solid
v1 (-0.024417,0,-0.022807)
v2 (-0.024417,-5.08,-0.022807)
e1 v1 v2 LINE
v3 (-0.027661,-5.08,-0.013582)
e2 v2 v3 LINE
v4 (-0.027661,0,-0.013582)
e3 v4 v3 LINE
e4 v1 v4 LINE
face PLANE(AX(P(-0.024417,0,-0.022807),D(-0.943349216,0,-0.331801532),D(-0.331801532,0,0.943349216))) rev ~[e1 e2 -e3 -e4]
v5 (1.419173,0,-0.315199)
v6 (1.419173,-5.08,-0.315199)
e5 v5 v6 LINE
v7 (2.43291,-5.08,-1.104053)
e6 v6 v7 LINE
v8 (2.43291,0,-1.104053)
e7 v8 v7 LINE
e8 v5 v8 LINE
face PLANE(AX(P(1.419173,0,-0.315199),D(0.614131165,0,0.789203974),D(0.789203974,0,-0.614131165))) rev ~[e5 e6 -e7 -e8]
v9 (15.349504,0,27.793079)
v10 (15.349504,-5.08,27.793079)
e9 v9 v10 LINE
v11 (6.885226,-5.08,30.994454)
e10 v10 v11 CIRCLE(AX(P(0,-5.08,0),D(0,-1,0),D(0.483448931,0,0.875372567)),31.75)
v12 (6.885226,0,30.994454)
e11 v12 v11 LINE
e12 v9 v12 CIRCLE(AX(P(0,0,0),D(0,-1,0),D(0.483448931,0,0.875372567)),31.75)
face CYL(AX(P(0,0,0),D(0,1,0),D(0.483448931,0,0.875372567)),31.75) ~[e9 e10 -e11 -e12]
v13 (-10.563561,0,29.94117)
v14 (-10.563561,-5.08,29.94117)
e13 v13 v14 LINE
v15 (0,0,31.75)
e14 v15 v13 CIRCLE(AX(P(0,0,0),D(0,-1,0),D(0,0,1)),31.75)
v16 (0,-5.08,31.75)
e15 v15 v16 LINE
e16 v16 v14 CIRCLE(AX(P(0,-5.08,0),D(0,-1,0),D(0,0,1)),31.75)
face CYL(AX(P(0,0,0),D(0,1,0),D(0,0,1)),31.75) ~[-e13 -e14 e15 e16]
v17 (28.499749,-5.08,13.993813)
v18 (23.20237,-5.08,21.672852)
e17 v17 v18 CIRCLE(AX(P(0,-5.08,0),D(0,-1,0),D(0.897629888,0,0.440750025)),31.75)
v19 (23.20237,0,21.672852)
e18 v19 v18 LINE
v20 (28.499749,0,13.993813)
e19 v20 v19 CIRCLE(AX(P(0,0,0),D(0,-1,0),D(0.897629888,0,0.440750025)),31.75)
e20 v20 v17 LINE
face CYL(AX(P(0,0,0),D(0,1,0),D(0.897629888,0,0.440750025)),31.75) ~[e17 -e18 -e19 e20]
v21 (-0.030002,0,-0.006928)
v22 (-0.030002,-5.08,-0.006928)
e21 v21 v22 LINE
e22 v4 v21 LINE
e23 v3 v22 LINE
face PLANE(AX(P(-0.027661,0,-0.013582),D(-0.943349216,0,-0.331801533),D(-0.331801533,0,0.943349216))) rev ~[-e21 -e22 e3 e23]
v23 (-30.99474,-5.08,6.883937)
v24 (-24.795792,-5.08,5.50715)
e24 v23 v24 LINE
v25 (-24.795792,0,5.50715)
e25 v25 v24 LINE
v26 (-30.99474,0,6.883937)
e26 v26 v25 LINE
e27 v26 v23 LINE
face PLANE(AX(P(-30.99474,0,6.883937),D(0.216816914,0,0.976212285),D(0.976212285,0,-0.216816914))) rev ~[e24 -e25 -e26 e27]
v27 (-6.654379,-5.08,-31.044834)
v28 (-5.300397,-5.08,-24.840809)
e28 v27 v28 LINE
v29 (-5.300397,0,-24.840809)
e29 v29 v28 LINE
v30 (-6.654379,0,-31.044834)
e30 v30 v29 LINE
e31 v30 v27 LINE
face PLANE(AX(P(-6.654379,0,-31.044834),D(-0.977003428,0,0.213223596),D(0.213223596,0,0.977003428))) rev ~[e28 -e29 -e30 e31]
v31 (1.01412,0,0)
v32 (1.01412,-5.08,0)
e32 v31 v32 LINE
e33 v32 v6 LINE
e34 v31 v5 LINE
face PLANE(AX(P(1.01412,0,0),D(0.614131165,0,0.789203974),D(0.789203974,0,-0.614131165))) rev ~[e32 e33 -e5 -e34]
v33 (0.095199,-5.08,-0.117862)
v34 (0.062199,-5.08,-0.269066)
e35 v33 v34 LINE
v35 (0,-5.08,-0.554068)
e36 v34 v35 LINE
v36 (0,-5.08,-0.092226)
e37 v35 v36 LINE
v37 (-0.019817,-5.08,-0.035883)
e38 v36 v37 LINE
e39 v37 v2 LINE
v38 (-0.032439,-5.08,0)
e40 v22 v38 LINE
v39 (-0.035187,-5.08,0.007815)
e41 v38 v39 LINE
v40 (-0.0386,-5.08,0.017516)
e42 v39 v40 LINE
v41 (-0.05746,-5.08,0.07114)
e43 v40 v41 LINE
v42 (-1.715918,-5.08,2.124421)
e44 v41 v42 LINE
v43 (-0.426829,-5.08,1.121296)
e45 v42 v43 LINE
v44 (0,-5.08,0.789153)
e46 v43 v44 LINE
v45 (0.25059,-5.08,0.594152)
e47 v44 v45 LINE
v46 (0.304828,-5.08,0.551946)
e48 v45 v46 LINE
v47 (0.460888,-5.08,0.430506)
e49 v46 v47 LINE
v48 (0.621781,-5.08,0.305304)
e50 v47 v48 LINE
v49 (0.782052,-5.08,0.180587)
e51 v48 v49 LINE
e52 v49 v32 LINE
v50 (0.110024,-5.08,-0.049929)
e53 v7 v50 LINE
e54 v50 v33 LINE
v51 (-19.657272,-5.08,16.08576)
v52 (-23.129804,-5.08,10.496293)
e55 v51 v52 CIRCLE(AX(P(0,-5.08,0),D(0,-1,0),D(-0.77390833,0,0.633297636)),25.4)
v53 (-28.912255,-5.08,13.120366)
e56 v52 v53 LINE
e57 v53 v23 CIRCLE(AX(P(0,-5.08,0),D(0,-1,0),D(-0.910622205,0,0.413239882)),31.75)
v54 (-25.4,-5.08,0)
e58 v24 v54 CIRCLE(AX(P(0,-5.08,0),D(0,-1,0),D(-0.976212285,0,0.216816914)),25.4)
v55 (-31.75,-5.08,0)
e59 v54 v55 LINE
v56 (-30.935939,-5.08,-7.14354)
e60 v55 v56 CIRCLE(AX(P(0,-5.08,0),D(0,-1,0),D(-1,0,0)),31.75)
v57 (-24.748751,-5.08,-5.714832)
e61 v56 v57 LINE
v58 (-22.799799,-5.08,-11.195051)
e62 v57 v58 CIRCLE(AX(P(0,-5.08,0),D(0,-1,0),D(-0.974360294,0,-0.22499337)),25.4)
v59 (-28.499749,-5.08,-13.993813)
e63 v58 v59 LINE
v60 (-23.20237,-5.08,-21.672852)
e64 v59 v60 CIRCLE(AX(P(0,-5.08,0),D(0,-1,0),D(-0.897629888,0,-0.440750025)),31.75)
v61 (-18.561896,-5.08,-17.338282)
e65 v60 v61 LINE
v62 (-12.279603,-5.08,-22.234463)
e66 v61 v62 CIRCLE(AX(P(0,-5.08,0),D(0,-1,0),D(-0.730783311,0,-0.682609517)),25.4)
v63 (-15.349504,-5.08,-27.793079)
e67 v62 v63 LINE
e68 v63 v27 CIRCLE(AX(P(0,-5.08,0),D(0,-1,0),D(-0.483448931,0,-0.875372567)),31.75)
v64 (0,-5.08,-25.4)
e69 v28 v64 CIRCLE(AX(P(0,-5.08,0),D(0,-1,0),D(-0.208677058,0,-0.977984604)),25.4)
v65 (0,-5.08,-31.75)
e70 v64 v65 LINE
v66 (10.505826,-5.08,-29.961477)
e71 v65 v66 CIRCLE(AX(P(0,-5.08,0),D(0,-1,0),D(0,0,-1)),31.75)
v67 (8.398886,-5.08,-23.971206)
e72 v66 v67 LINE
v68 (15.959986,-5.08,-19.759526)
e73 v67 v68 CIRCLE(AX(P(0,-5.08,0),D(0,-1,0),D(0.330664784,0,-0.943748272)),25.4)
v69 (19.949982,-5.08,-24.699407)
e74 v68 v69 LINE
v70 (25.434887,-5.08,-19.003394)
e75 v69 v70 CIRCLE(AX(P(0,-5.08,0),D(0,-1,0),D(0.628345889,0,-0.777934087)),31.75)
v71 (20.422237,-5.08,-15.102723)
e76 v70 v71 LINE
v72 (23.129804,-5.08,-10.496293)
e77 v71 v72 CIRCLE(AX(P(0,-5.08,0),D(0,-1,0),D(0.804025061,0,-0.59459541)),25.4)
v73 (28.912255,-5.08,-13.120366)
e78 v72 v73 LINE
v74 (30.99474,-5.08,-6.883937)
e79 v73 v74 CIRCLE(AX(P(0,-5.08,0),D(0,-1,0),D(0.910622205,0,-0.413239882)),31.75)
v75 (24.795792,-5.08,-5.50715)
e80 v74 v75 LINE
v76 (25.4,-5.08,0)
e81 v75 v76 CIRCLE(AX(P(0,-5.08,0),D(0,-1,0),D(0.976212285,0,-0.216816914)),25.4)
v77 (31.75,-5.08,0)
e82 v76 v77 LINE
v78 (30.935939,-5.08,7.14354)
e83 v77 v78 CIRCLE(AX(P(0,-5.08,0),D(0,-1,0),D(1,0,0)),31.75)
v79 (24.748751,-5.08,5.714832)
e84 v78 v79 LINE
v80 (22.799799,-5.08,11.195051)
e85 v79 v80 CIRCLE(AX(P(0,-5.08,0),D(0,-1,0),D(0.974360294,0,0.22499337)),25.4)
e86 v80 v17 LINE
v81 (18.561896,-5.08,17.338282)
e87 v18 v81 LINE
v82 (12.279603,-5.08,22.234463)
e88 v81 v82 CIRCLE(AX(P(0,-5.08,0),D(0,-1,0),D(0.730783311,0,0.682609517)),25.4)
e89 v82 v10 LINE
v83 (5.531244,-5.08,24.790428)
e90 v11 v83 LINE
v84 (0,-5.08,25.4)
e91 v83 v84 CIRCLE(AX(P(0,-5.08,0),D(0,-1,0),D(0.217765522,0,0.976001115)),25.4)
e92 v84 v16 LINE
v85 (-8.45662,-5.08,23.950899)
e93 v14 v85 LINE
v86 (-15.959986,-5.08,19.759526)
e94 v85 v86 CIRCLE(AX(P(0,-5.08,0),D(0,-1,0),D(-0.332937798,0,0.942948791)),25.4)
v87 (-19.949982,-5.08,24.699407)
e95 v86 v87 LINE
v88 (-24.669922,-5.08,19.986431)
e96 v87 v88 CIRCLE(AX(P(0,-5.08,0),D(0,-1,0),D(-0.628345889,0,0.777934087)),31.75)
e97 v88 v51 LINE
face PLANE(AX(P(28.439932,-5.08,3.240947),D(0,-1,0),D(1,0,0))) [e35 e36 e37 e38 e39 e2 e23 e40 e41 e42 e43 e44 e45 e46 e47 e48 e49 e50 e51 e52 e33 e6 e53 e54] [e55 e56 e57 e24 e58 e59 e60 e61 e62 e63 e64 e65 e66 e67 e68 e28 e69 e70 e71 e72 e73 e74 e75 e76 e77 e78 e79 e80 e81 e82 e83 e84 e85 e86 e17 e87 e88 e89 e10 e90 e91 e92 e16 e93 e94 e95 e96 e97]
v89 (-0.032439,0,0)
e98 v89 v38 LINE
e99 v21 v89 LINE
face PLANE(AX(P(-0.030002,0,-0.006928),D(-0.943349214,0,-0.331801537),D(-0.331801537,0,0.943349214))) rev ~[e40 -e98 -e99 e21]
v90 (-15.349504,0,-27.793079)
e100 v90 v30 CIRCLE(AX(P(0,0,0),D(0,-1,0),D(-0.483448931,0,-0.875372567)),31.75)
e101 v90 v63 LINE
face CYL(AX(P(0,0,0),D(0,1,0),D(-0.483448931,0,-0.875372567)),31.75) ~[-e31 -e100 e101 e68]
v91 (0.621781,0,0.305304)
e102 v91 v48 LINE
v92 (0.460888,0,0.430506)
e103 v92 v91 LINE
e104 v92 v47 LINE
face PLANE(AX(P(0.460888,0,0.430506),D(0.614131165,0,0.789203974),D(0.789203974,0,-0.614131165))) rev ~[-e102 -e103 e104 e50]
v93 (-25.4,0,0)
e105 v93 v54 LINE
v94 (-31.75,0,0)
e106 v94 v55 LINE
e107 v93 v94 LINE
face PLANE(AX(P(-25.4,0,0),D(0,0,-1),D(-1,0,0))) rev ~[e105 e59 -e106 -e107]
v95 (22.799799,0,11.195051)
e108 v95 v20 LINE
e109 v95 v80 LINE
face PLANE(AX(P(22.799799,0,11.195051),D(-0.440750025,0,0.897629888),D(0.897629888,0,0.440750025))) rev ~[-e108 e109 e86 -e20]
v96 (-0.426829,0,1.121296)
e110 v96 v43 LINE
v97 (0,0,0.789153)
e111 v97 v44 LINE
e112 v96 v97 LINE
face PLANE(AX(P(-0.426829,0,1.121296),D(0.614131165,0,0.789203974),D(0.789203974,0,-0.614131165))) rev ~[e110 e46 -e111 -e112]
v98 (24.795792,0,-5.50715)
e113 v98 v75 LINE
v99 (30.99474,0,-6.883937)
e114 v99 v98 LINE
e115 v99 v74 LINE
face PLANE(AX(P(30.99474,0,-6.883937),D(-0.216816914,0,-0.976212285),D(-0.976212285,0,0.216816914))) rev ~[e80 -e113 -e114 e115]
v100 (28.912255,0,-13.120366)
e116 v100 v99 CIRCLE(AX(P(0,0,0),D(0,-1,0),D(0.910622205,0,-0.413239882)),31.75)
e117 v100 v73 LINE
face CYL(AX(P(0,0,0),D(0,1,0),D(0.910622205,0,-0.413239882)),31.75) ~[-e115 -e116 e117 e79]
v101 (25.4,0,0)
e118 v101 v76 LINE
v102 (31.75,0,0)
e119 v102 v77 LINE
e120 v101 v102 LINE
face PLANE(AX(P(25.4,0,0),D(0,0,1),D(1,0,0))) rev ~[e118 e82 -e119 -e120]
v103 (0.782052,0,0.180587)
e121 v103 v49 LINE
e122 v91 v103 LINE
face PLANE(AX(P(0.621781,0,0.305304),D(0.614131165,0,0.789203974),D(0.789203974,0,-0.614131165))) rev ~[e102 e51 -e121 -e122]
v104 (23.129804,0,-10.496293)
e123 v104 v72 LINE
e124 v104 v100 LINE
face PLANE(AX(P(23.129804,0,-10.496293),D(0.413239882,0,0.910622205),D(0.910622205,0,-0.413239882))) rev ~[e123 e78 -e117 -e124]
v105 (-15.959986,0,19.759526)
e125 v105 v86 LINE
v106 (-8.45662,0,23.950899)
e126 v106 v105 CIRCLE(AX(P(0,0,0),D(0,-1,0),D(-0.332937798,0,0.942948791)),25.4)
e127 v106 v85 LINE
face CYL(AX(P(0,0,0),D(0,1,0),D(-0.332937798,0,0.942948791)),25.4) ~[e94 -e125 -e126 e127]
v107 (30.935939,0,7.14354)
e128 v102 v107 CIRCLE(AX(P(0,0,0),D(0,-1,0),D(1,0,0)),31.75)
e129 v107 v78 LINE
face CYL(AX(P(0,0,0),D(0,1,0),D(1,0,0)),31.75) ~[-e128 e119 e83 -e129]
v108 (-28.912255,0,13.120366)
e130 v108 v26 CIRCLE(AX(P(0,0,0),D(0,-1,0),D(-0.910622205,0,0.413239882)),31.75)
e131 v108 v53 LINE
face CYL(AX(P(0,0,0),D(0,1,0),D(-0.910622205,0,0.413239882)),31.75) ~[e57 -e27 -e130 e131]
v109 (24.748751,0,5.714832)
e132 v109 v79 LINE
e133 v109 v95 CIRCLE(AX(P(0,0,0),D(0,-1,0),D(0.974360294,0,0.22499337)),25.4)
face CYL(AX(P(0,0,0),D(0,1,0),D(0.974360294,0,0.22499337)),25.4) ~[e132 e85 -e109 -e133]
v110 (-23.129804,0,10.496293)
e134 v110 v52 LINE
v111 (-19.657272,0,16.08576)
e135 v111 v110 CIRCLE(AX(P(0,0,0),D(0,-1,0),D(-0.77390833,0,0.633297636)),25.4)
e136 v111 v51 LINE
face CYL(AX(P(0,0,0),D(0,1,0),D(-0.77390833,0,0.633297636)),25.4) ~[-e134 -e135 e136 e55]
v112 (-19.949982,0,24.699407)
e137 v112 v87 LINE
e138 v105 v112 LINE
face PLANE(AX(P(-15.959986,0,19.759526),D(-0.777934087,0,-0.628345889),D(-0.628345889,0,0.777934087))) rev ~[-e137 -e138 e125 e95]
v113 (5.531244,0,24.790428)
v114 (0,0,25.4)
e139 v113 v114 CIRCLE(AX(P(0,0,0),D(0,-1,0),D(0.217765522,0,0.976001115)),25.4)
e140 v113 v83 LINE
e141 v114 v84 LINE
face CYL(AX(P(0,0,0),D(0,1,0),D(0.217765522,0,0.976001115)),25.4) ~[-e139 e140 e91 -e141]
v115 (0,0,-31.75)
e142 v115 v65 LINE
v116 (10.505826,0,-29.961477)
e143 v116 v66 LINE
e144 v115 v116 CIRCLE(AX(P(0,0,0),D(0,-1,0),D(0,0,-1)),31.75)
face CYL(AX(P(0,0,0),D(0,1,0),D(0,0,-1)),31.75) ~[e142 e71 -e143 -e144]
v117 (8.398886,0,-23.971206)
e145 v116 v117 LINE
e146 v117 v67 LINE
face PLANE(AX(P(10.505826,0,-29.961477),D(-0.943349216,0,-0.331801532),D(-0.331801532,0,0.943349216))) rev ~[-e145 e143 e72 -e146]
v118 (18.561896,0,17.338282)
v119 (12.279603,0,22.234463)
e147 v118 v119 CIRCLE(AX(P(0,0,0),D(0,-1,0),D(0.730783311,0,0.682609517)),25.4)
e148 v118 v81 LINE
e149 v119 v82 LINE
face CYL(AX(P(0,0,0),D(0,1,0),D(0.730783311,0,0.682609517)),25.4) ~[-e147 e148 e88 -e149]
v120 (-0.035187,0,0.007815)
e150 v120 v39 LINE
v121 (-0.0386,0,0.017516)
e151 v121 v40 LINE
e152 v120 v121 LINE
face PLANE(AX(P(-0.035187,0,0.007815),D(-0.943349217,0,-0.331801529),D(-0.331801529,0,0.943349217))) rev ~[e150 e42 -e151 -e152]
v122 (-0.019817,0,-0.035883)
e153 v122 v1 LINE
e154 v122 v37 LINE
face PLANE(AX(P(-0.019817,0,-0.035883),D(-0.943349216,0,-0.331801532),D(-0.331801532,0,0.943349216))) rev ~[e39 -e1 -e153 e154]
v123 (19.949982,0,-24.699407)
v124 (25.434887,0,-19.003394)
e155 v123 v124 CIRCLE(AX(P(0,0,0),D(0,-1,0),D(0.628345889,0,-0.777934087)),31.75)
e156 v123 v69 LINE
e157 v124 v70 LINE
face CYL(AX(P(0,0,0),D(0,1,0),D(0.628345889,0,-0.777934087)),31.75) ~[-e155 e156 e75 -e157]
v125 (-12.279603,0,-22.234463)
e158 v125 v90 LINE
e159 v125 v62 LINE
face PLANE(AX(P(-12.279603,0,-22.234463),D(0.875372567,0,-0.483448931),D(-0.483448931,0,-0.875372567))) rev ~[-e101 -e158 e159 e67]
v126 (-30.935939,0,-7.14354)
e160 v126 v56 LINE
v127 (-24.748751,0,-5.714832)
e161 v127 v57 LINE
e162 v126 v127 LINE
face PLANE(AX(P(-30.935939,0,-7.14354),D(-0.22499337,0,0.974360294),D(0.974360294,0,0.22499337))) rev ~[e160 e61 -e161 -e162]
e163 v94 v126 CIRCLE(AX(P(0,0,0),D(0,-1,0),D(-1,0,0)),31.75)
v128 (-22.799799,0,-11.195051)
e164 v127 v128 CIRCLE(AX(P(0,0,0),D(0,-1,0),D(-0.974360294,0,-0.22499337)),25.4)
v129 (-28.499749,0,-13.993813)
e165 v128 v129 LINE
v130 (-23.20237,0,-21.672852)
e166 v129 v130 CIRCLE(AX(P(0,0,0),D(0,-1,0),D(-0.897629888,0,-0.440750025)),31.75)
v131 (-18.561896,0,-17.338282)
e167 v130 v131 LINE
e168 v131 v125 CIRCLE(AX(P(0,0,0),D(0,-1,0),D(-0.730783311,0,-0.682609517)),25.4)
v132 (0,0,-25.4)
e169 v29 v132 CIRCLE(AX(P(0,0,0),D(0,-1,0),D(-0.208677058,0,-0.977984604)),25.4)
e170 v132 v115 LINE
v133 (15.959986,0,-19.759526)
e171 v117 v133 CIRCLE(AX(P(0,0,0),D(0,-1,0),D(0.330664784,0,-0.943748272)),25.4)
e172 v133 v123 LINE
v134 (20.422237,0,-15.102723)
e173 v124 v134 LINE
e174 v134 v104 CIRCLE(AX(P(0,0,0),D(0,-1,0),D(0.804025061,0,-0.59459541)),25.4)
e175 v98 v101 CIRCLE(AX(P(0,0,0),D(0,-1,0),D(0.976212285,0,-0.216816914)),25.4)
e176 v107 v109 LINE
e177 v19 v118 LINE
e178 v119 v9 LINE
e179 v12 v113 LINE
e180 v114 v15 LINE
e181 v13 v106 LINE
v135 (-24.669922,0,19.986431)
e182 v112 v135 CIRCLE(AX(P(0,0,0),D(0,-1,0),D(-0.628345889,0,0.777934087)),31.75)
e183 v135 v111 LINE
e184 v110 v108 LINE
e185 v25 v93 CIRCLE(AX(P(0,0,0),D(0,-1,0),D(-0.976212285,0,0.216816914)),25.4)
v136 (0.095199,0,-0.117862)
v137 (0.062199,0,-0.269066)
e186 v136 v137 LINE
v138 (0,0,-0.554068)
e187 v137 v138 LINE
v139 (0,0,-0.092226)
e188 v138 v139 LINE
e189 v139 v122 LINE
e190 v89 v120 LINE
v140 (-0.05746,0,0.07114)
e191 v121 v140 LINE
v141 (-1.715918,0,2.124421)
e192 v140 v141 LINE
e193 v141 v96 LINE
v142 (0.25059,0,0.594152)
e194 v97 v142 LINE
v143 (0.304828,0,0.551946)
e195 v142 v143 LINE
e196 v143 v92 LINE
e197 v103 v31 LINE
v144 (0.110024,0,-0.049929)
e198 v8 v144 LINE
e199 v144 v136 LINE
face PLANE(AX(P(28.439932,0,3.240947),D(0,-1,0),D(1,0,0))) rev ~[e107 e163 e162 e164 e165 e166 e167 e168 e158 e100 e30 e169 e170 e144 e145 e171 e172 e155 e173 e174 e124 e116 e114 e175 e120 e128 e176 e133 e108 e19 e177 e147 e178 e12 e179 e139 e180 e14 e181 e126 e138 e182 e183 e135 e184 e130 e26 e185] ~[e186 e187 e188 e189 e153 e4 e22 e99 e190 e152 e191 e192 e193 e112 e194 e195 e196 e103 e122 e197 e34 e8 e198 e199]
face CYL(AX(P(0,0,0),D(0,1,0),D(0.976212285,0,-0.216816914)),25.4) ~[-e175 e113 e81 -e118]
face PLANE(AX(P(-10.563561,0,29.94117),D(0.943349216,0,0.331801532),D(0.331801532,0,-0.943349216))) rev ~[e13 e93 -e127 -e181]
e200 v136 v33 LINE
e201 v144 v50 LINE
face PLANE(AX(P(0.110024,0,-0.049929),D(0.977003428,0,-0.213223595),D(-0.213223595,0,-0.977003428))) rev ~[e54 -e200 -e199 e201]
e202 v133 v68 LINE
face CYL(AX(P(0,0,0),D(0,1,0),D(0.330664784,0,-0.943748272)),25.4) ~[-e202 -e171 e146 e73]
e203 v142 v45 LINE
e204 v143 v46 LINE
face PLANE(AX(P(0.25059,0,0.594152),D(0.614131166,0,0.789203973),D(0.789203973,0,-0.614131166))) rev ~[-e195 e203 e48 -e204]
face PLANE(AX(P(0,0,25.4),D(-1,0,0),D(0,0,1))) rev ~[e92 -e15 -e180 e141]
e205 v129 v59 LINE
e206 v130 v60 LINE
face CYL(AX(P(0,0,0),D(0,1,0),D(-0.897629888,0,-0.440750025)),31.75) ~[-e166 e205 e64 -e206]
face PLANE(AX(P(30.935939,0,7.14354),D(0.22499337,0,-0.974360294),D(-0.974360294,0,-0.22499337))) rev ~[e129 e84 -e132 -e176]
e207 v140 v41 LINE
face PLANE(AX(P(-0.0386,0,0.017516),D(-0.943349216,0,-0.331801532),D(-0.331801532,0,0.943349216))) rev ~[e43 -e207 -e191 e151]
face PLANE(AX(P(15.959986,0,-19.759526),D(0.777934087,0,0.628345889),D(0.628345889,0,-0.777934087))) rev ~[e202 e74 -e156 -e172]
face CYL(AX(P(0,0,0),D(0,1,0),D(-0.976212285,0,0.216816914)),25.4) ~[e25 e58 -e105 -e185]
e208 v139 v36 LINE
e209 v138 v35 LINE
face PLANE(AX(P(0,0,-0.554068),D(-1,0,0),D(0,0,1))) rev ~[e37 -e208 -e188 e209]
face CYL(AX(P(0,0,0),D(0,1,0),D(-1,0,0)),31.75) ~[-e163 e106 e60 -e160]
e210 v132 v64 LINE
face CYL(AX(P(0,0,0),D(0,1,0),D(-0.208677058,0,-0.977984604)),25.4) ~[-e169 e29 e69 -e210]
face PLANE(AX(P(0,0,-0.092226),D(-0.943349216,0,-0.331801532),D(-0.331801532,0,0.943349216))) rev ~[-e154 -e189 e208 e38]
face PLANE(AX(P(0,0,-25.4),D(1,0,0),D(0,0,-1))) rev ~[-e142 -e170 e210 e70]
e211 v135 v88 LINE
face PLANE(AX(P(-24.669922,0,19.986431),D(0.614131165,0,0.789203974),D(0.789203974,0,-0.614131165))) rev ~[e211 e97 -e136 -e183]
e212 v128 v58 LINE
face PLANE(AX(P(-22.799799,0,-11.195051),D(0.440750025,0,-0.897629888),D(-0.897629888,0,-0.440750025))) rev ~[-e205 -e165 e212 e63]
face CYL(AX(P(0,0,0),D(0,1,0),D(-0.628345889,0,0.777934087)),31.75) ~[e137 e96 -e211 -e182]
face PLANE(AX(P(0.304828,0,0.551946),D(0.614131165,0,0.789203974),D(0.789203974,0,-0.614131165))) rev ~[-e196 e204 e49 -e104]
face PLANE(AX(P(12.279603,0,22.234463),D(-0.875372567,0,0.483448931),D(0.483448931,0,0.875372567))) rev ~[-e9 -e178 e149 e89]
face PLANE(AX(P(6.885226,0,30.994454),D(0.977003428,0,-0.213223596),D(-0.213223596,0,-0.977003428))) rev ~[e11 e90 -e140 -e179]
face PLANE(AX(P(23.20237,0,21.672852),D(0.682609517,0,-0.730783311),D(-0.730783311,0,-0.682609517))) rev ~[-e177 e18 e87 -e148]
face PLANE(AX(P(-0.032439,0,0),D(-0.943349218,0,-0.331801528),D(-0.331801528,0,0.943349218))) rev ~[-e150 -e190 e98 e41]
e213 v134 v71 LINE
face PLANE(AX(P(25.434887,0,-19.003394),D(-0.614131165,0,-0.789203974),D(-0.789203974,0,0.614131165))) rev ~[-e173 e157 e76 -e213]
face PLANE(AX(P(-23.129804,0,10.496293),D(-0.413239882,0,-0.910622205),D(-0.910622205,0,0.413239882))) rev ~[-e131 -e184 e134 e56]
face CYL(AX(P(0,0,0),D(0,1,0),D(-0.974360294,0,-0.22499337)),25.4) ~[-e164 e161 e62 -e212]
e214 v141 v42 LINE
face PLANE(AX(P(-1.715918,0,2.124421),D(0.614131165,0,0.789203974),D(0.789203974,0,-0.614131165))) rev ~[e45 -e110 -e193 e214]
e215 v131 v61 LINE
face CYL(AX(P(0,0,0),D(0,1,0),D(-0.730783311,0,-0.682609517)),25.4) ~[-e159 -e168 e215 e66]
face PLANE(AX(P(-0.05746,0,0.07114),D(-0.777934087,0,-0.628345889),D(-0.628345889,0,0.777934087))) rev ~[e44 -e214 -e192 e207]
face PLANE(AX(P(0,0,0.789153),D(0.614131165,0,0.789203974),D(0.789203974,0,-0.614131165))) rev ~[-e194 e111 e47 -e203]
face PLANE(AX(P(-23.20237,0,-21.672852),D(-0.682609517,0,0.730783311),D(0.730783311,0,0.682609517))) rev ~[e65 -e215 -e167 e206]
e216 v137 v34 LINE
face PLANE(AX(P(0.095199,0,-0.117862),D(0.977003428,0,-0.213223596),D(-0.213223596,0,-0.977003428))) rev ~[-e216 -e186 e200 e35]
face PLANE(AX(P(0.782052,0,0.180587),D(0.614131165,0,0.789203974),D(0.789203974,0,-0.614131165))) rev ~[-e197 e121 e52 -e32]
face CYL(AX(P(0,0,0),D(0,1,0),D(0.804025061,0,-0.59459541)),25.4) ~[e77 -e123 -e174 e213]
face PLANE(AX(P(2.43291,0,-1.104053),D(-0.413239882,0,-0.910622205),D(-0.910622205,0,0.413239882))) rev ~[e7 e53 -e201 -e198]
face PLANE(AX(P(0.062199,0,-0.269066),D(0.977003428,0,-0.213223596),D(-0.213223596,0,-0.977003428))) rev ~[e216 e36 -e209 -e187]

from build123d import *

# Parameters (mm, degrees)
F1_DEPTH = 5.08


with BuildPart() as f1:
    # F0 (on Front) → F1 (new body)
    with BuildSketch(Plane.XZ):
        with BuildLine():
            Line((25.4, 0), (31.75, 0))
            ThreePointArc((31.75, 0), (31.5458283638, 3.5948870413), (30.9359393487, 7.1435395019))
            Line((30.9359393487, 7.1435395019), (24.7487514789, 5.7148316015))
            ThreePointArc((24.7487514789, 5.7148316015), (25.2366626911, 2.875909633), (25.4, 0))
        make_face()
        with BuildLine():
            ThreePointArc((28.9122550087, -13.1203662416), (30.1153661217, -10.0562032277), (30.9947400528, -6.8839370321))
            Line((30.9947400528, -6.8839370321), (24.7957920422, -5.5071496257))
            ThreePointArc((24.7957920422, -5.5071496257), (24.0922928974, -8.0449625821), (23.1298040069, -10.4962929933))
            Line((23.1298040069, -10.4962929933), (28.9122550087, -13.1203662416))
        make_face()
        with BuildLine():
            ThreePointArc((24.7957920422, -5.5071496257), (25.2484961718, -2.7700976633), (25.4, 0))
            Line((25.4, 0), (1.0141198158, 0))
            Line((1.0141198158, 0), (1.4191734003, -0.3151986533))
            Line((1.4191734003, -0.3151986533), (24.7957920422, -5.5071496257))
        make_face()
        with BuildLine():
            Line((1.0141198158, 0), (25.4, 0))
            ThreePointArc((25.4, 0), (25.2366626911, 2.875909633), (24.7487514789, 5.7148316015))
            Line((24.7487514789, 5.7148316015), (0.7820524179, 0.1805868016))
            Line((0.7820524179, 0.1805868016), (1.0141198158, 0))
        make_face()
        with BuildLine():
            Line((22.7997991551, 11.1950506245), (28.4997489439, 13.9938132806))
            ThreePointArc((28.4997489439, 13.9938132806), (26.1346358015, 18.0289575828), (23.2023701208, 21.6728521606))
            Line((23.2023701208, 21.6728521606), (18.5618960967, 17.3382817285))
            ThreePointArc((18.5618960967, 17.3382817285), (20.9077086412, 14.4231660663), (22.7997991551, 11.1950506245))
        make_face()
        with BuildLine():
            Line((0.7820524179, 0.1805868016), (24.7487514789, 5.7148316015))
            ThreePointArc((24.7487514789, 5.7148316015), (23.9316603474, 8.5109125841), (22.7997991551, 11.1950506245))
            Line((22.7997991551, 11.1950506245), (0.6217813672, 0.3053041755))
            Line((0.6217813672, 0.3053041755), (0.7820524179, 0.1805868016))
        make_face()
        with BuildLine():
            ThreePointArc((23.1298040069, -10.4962929933), (24.0922928974, -8.0449625821), (24.7957920422, -5.5071496257))
            Line((24.7957920422, -5.5071496257), (1.4191734003, -0.3151986533))
            Line((1.4191734003, -0.3151986533), (2.4329098989, -1.104053243))
            Line((2.4329098989, -1.104053243), (23.1298040069, -10.4962929933))
        make_face()
        with BuildLine():
            Line((0.6217813672, 0.3053041755), (22.7997991551, 11.1950506245))
            ThreePointArc((22.7997991551, 11.1950506245), (20.9077086412, 14.4231660663), (18.5618960967, 17.3382817285))
            Line((18.5618960967, 17.3382817285), (0.4608879437, 0.4305058584))
            Line((0.4608879437, 0.4305058584), (0.6217813672, 0.3053041755))
        make_face()
        with BuildLine():
            ThreePointArc((19.9499819818, -24.6994072586), (22.8704554558, -22.02282378), (25.4348874095, -19.0033944986))
            Line((25.4348874095, -19.0033944986), (20.4222365417, -15.1027234178))
            ThreePointArc((20.4222365417, -15.1027234178), (18.3395194553, -17.5733328128), (15.9599855854, -19.7595258069))
            Line((15.9599855854, -19.7595258069), (19.9499819818, -24.6994072586))
        make_face()
        with BuildLine():
            ThreePointArc((20.4222365417, -15.1027234178), (21.8974852278, -12.8709028704), (23.1298040069, -10.4962929933))
            Line((23.1298040069, -10.4962929933), (2.4329098989, -1.104053243))
            Line((2.4329098989, -1.104053243), (20.4222365417, -15.1027234178))
        make_face()
        with BuildLine():
            Line((12.2796028487, 22.2344632019), (15.3495035609, 27.7930790024))
            ThreePointArc((15.3495035609, 27.7930790024), (11.2320077334, 29.6968769785), (6.8852258142, 30.9944537859))
            Line((6.8852258142, 30.9944537859), (5.5312442607, 24.7904283329))
            ThreePointArc((5.5312442607, 24.7904283329), (8.9966553856, 23.7533195969), (12.2796028487, 22.2344632019))
        make_face()
        with BuildLine():
            Line((0.4608879437, 0.4305058584), (18.5618960967, 17.3382817285))
            ThreePointArc((18.5618960967, 17.3382817285), (15.6138612314, 20.0341542733), (12.2796028487, 22.2344632019))
            Line((12.2796028487, 22.2344632019), (0.3048278221, 0.5519464332))
            Line((0.3048278221, 0.5519464332), (0.4608879437, 0.4305058584))
        make_face()
        with BuildLine():
            ThreePointArc((15.9599855854, -19.7595258069), (18.3395194553, -17.5733328128), (20.4222365417, -15.1027234178))
            Line((20.4222365417, -15.1027234178), (2.4329098989, -1.104053243))
            Line((2.4329098989, -1.104053243), (0.1100244544, -0.04992904))
            Line((0.1100244544, -0.04992904), (0.0951985642, -0.1178621669))
            Line((0.0951985642, -0.1178621669), (15.9599855854, -19.7595258069))
        make_face()
        with BuildLine():
            Line((0.3048278221, 0.5519464332), (12.2796028487, 22.2344632019))
            ThreePointArc((12.2796028487, 22.2344632019), (8.9966553856, 23.7533195969), (5.5312442607, 24.7904283329))
            Line((5.5312442607, 24.7904283329), (0.2505903033, 0.5941521896))
            Line((0.2505903033, 0.5941521896), (0.3048278221, 0.5519464332))
        make_face()
        with BuildLine():
            Line((0, -30.624730456), (10.5058264675, -29.9614771037))
            Line((10.5058264675, -29.9614771037), (8.3988855156, -23.9712061043))
            ThreePointArc((8.3988855156, -23.9712061043), (4.2597749325, -25.0402539429), (0, -25.4))
            Line((0, -25.4), (0, -30.624730456))
        make_face()
        with BuildLine():
            ThreePointArc((0, -31.75), (5.3284895589, -31.2996757015), (10.5058264675, -29.9614771037))
            Line((10.5058264675, -29.9614771037), (0, -30.624730456))
            Line((0, -30.624730456), (0, -31.75))
        make_face()
        with BuildLine():
            ThreePointArc((8.3988855156, -23.9712061043), (12.3601461586, -22.1897901508), (15.9599855854, -19.7595258069))
            Line((15.9599855854, -19.7595258069), (0.0951985642, -0.1178621669))
            Line((0.0951985642, -0.1178621669), (0.0621994091, -0.2690662935))
            Line((0.0621994091, -0.2690662935), (8.3988855156, -23.9712061043))
        make_face()
        with BuildLine():
            Line((-0.0300018042, -0.0069278347), (-0.0324385118, 0))
            Line((-0.0324385118, 0), (-25.4, 0))
            ThreePointArc((-25.4, 0), (-25.2366626911, -2.875909633), (-24.7487514789, -5.7148316015))
            Line((-24.7487514789, -5.7148316015), (-0.0300018042, -0.0069278347))
        make_face()
        with BuildLine():
            Line((-25.4, 0), (-0.0324385118, 0))
            Line((-0.0324385118, 0), (-0.0351872962, 0.0078151045))
            Line((-0.0351872962, 0.0078151045), (-24.7957920422, 5.5071496257))
            ThreePointArc((-24.7957920422, 5.5071496257), (-25.2484961718, 2.7700976633), (-25.4, 0))
        make_face()
        with BuildLine():
            Line((-0.03859952, 0.0175164421), (-0.0574602451, 0.0711396129))
            Line((-0.0574602451, 0.0711396129), (-1.7159178196, 2.1244206179))
            Line((-1.7159178196, 2.1244206179), (-19.6572715888, 16.085759966))
            ThreePointArc((-19.6572715888, 16.085759966), (-21.5753098418, 13.4039548354), (-23.1298040069, 10.4962929933))
            Line((-23.1298040069, 10.4962929933), (-0.03859952, 0.0175164421))
        make_face()
        with BuildLine():
            Line((0, -0.0922263513), (-0.0198174482, -0.0358831086))
            Line((-0.0198174482, -0.0358831086), (-12.2796028487, -22.2344632019))
            ThreePointArc((-12.2796028487, -22.2344632019), (-8.8860767808, -23.794907847), (-5.3003972682, -24.8408089401))
            Line((-5.3003972682, -24.8408089401), (0, -0.5540677516))
            Line((0, -0.5540677516), (0, -0.0922263513))
        make_face()
        with BuildLine():
            Line((-12.2796028487, -22.2344632019), (-0.0198174482, -0.0358831086))
            Line((-0.0198174482, -0.0358831086), (-0.0244166428, -0.0228070791))
            Line((-0.0244166428, -0.0228070791), (-18.5618960967, -17.3382817285))
            ThreePointArc((-18.5618960967, -17.3382817285), (-15.6138612314, -20.0341542733), (-12.2796028487, -22.2344632019))
        make_face()
        with BuildLine():
            Line((-0.0351872962, 0.0078151045), (-0.03859952, 0.0175164421))
            Line((-0.03859952, 0.0175164421), (-23.1298040069, 10.4962929933))
            ThreePointArc((-23.1298040069, 10.4962929933), (-24.0922928974, 8.0449625821), (-24.7957920422, 5.5071496257))
            Line((-24.7957920422, 5.5071496257), (-0.0351872962, 0.0078151045))
        make_face()
        with BuildLine():
            Line((-0.0244166428, -0.0228070791), (-0.0276613091, -0.0135821265))
            Line((-0.0276613091, -0.0135821265), (-22.7997991551, -11.1950506245))
            ThreePointArc((-22.7997991551, -11.1950506245), (-20.9077086412, -14.4231660663), (-18.5618960967, -17.3382817285))
            Line((-18.5618960967, -17.3382817285), (-0.0244166428, -0.0228070791))
        make_face()
        with BuildLine():
            Line((-22.7997991551, -11.1950506245), (-0.0276613091, -0.0135821265))
            Line((-0.0276613091, -0.0135821265), (-0.0300018042, -0.0069278347))
            Line((-0.0300018042, -0.0069278347), (-24.7487514789, -5.7148316015))
            ThreePointArc((-24.7487514789, -5.7148316015), (-23.9316603474, -8.5109125841), (-22.7997991551, -11.1950506245))
        make_face()
        with BuildLine():
            Line((-0.4268288624, 1.1212962933), (0, 0.7891528738))
            Line((0, 0.7891528738), (0, 25.4))
            ThreePointArc((0, 25.4), (-4.2899392789, 25.0351037742), (-8.4566200813, 23.95089929))
            Line((-8.4566200813, 23.95089929), (-0.4268288624, 1.1212962933))
        make_face()
        with BuildLine():
            Line((0, 25.4), (0, 0.7891528738))
            Line((0, 0.7891528738), (0.2505903033, 0.5941521896))
            Line((0.2505903033, 0.5941521896), (5.5312442607, 24.7904283329))
            ThreePointArc((5.5312442607, 24.7904283329), (2.7823659307, 25.2471471622), (0, 25.4))
        make_face()
        with BuildLine():
            Line((0, 25.4), (0, 31.75))
            ThreePointArc((0, 31.75), (-5.3586539033, 31.2945255331), (-10.5635610332, 29.9411702894))
            Line((-10.5635610332, 29.9411702894), (-8.4566200813, 23.95089929))
            ThreePointArc((-8.4566200813, 23.95089929), (-4.2899392789, 25.0351037742), (0, 25.4))
        make_face()
        with BuildLine():
            ThreePointArc((0, -25.4), (4.2597749325, -25.0402539429), (8.3988855156, -23.9712061043))
            Line((8.3988855156, -23.9712061043), (0.0621994091, -0.2690662935))
            Line((0.0621994091, -0.2690662935), (0, -0.5540677516))
            Line((0, -0.5540677516), (0, -25.4))
        make_face()
        with BuildLine():
            ThreePointArc((-24.7487514789, -5.7148316015), (-25.2366626911, -2.875909633), (-25.4, 0))
            Line((-25.4, 0), (-31.75, 0))
            ThreePointArc((-31.75, 0), (-31.5458283638, -3.5948870413), (-30.9359393487, -7.1435395019))
            Line((-30.9359393487, -7.1435395019), (-24.7487514789, -5.7148316015))
        make_face()
        with BuildLine():
            Line((-19.6572715888, 16.085759966), (-1.7159178196, 2.1244206179))
            Line((-1.7159178196, 2.1244206179), (-15.9599855854, 19.7595258069))
            ThreePointArc((-15.9599855854, 19.7595258069), (-17.9031112106, 18.017730406), (-19.6572715888, 16.085759966))
        make_face()
        with BuildLine():
            Line((-15.9599855854, 19.7595258069), (-1.7159178196, 2.1244206179))
            Line((-1.7159178196, 2.1244206179), (-0.4268288624, 1.1212962933))
            Line((-0.4268288624, 1.1212962933), (-8.4566200813, 23.95089929))
            ThreePointArc((-8.4566200813, 23.95089929), (-12.3868705083, 22.1748830664), (-15.9599855854, 19.7595258069))
        make_face()
        with BuildLine():
            ThreePointArc((-5.3003972682, -24.8408089401), (-8.8860767808, -23.794907847), (-12.2796028487, -22.2344632019))
            Line((-12.2796028487, -22.2344632019), (-15.3495035609, -27.7930790024))
            ThreePointArc((-15.3495035609, -27.7930790024), (-11.1214292363, -29.7384651881), (-6.6543788217, -31.0448343931))
            Line((-6.6543788217, -31.0448343931), (-5.3003972682, -24.8408089401))
        make_face()
        with BuildLine():
            ThreePointArc((-24.7957920422, 5.5071496257), (-24.0922928974, 8.0449625821), (-23.1298040069, 10.4962929933))
            Line((-23.1298040069, 10.4962929933), (-28.9122550087, 13.1203662416))
            ThreePointArc((-28.9122550087, 13.1203662416), (-30.1153661217, 10.0562032277), (-30.9947400528, 6.8839370321))
            Line((-30.9947400528, 6.8839370321), (-24.7957920422, 5.5071496257))
        make_face()
        with BuildLine():
            ThreePointArc((-18.5618960967, -17.3382817285), (-20.9077086412, -14.4231660663), (-22.7997991551, -11.1950506245))
            Line((-22.7997991551, -11.1950506245), (-28.4997489439, -13.9938132806))
            ThreePointArc((-28.4997489439, -13.9938132806), (-26.1346358015, -18.0289575828), (-23.2023701208, -21.6728521606))
            Line((-23.2023701208, -21.6728521606), (-18.5618960967, -17.3382817285))
        make_face()
        with BuildLine():
            Line((0, -25.4), (0, -0.5540677516))
            Line((0, -0.5540677516), (-5.3003972682, -24.8408089401))
            ThreePointArc((-5.3003972682, -24.8408089401), (-2.6649064638, -25.25981539), (0, -25.4))
        make_face()
        with BuildLine():
            ThreePointArc((-19.6572715888, 16.085759966), (-17.9031112106, 18.017730406), (-15.9599855854, 19.7595258069))
            Line((-15.9599855854, 19.7595258069), (-19.9499819818, 24.6994072586))
            ThreePointArc((-19.9499819818, 24.6994072586), (-22.4340590223, 22.4672093457), (-24.6699224566, 19.9864310467))
            Line((-24.6699224566, 19.9864310467), (-19.6572715888, 16.085759966))
        make_face()
    extrude(amount=F1_DEPTH)


solid = f1.part
